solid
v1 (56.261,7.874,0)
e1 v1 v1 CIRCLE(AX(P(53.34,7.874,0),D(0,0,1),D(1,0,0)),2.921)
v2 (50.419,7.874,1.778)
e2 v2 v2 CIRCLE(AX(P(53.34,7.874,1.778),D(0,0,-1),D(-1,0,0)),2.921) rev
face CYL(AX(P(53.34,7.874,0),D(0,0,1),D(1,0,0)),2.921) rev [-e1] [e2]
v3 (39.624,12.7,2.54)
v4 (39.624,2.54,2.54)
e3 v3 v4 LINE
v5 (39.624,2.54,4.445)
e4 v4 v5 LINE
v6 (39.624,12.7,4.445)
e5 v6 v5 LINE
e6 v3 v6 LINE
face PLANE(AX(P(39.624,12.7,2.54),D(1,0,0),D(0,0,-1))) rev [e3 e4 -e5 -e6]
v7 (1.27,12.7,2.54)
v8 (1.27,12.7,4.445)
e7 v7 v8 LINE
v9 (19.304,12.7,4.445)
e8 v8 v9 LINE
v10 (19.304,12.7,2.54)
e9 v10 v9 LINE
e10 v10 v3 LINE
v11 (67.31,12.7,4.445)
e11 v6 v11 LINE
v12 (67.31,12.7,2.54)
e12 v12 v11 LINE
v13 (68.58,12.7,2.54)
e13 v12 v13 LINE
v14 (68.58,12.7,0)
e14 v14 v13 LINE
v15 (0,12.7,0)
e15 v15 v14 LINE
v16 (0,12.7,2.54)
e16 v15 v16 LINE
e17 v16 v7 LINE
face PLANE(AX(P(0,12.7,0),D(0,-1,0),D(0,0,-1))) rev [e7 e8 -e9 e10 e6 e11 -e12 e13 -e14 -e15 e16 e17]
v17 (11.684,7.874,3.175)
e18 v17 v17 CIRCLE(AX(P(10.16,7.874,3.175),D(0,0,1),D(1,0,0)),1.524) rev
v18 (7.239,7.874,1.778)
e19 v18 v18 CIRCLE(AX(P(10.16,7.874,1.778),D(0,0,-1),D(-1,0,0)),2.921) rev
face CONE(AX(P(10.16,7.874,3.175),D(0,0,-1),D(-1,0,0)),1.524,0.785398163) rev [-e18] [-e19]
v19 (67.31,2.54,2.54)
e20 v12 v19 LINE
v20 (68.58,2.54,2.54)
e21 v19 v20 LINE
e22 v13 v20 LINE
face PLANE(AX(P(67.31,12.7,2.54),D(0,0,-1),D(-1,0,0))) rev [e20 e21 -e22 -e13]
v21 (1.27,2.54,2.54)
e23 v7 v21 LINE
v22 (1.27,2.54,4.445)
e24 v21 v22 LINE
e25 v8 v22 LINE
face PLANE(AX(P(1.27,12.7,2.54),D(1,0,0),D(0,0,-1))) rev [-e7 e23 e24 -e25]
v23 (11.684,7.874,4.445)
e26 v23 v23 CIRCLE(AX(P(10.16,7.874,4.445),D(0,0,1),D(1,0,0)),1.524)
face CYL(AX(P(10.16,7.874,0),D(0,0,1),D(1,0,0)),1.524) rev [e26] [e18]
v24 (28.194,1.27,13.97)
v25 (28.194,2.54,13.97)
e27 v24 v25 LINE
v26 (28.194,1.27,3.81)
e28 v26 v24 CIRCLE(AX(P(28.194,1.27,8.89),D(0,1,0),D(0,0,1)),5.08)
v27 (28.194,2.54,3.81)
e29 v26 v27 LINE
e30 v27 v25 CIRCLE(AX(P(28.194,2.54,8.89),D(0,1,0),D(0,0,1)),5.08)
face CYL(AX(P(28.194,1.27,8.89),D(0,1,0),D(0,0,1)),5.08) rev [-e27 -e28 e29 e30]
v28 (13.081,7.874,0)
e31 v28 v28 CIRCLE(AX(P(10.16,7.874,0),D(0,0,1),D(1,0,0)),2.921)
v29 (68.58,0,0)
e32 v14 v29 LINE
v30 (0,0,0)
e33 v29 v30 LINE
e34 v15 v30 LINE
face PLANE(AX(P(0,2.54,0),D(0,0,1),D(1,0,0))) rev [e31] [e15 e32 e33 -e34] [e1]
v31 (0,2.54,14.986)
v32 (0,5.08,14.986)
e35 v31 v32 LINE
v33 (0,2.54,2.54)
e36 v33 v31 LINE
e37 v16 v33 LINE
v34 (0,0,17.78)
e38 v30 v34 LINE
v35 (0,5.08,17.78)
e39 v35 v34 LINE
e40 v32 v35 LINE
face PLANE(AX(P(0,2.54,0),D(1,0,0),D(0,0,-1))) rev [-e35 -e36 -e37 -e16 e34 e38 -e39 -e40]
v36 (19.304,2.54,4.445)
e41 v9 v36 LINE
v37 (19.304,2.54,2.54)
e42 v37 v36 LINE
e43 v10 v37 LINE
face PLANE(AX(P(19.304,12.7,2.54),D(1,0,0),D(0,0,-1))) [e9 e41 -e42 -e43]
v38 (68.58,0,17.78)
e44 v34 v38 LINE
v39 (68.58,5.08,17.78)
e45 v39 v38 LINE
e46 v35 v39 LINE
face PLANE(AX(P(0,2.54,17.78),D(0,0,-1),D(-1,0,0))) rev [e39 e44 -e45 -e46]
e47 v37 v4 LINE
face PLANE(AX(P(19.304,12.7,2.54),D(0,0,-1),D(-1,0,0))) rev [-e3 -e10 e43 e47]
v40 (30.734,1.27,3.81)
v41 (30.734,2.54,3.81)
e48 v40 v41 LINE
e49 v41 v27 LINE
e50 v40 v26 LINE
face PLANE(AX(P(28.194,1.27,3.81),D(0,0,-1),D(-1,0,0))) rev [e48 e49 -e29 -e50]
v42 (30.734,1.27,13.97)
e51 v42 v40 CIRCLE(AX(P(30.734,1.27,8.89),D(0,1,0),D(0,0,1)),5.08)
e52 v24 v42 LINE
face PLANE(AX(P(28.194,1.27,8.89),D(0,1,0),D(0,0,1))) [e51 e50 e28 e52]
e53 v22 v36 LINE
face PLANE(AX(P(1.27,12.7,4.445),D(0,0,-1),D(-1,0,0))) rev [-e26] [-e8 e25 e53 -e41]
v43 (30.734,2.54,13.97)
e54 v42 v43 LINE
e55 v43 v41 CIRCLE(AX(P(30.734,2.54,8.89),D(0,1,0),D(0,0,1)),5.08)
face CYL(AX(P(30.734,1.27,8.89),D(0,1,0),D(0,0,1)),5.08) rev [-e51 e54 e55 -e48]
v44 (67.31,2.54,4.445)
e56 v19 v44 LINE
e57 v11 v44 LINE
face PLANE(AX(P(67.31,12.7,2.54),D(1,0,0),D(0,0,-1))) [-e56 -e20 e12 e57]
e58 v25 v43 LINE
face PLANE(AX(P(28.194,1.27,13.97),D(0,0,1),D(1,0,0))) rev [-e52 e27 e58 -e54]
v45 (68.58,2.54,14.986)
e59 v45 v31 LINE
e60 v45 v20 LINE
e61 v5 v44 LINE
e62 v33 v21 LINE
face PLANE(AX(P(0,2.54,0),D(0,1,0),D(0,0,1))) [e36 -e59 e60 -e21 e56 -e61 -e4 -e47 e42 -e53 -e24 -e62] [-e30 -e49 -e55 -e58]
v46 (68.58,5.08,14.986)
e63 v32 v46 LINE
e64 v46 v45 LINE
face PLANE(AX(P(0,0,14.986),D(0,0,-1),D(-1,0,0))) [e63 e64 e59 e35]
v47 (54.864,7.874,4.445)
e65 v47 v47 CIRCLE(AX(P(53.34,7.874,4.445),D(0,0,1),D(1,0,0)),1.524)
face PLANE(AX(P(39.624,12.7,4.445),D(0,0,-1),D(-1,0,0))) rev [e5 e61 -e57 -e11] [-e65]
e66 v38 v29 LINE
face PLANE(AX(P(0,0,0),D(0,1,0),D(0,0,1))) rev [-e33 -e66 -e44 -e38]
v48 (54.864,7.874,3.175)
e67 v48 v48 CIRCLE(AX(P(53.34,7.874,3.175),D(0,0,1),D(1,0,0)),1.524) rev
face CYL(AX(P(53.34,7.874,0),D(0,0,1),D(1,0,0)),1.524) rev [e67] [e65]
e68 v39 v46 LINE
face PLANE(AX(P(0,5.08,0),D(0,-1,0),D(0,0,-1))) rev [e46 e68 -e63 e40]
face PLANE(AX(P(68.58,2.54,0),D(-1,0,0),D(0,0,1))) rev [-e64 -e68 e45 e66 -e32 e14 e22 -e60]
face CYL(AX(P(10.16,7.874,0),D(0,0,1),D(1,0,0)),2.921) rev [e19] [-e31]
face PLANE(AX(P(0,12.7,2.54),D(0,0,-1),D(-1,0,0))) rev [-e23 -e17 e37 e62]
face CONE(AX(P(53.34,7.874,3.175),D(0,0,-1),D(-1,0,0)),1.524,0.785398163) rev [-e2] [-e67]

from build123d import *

# Parameters (mm, degrees)
SKETCH2_W                           = 68.58
SKETCH2_H                           = 17.78
BOSS_EXTRUDE1_DEPTH                 = 2.54
SKETCH3_W                           = 68.58
SKETCH3_H                           = 2.54
BOSS_EXTRUDE2_DEPTH                 = 2.54
BOSS_EXTRUDE3_DEPTH                 = 10.16
SKETCH5_R                           = 1.524
CUT_EXTRUDE1_DEPTH                  = 72.009355898
CUT_EXTRUDE2_START                  = -3.81
SKETCH6_R                           = 2.921
CUT_EXTRUDE2_DEPTH                  = 68.199355898
CHAMFER1_SIZE                       = 2.54
CUT_EXTRUDE3_DEPTH                  = 1.27
SKETCH8_W                           = 68.58
SKETCH8_H                           = 2.54
EXTRA_WIDTH_FOR_MIRRORED_PART_DEPTH = 0.254


with BuildPart() as part:
    # Sketch2 → Boss-Extrude1 (new body)
    with BuildSketch(Plane(origin=(0, 0, 0), x_dir=(1, 0, 0), z_dir=(0, 1, 0))):
        with Locations((34.29, -8.89)):
            Rectangle(SKETCH2_W, SKETCH2_H)
    extrude(amount=BOSS_EXTRUDE1_DEPTH)

    # Sketch3 → Boss-Extrude2 (add)
    with BuildSketch(Plane(origin=(0, 2.54, 0), x_dir=(1, 0, 0), z_dir=(0, 1, 0))):
        with Locations((34.29, -16.51)):
            Rectangle(SKETCH3_W, SKETCH3_H)
    extrude(amount=BOSS_EXTRUDE2_DEPTH)

    # Sketch4 → Boss-Extrude3 (add)
    with BuildSketch(Plane(origin=(0, 2.54, 0), x_dir=(1, 0, 0), z_dir=(0, 1, 0))):
        Polygon((0, 0), (68.58, 0), (68.58, -2.54), (67.31, -2.54), (67.31, -4.445), (39.624, -4.445), (39.624, -2.54), (19.304, -2.54), (19.304, -4.445), (1.27, -4.445), (1.27, -2.54), (0, -2.54), align=None)
    extrude(amount=BOSS_EXTRUDE3_DEPTH)

    # Sketch5 → Cut-Extrude1 (cut, through all)
    with BuildSketch(Plane.XY.offset(4.445)):
        with Locations((10.16, 7.874)):
            Circle(SKETCH5_R)
        with Locations((53.34, 7.874)):
            Circle(SKETCH5_R)
    extrude(amount=-CUT_EXTRUDE1_DEPTH, mode=Mode.SUBTRACT)

    # Sketch6 → Cut-Extrude2 (cut, through all)
    with BuildSketch(Plane.XY.offset(4.445).offset(CUT_EXTRUDE2_START)):
        with Locations((10.16, 7.874)):
            Circle(SKETCH6_R)
        with Locations((53.34, 7.874)):
            Circle(SKETCH6_R)
    extrude(amount=-CUT_EXTRUDE2_DEPTH, mode=Mode.SUBTRACT)

    # Chamfer1
    # the kernel refuses this chamfer: 2.54 mm, written as the material it takes off along each edge
    with BuildSketch(Plane(origin=(53.34, 7.874, 0.635), x_dir=(1, 0, 0), z_dir=(0, -1, 0))) as chamfer1_piece_1_section:
        Polygon((1.524 + CHAMFER1_SIZE, 0), (1.524, CHAMFER1_SIZE), (1.524, 0), align=None)
    chamfer1_piece_1 = revolve(axis=Axis((53.34, 7.874, 0.635), (0, 0, 1)), mode=Mode.PRIVATE)
    chamfer1_piece_1 = chamfer1_piece_1 & Plane(origin=(53.34, 7.874, 2.488878995), x_dir=(1, 0, 0), z_dir=(0, 0, 1)) * Cylinder(2.921, 17, mode=Mode.PRIVATE)
    add(chamfer1_piece_1, mode=Mode.SUBTRACT)
    with BuildSketch(Plane(origin=(10.16, 7.874, 0.635), x_dir=(1, 0, 0), z_dir=(0, -1, 0))) as chamfer1_piece_2_section:
        Polygon((1.524 + CHAMFER1_SIZE, 0), (1.524, CHAMFER1_SIZE), (1.524, 0), align=None)
    chamfer1_piece_2 = revolve(axis=Axis((10.16, 7.874, 0.635), (0, 0, 1)), mode=Mode.PRIVATE)
    chamfer1_piece_2 = chamfer1_piece_2 & Plane(origin=(10.16, 7.874, 2.488878995), x_dir=(1, 0, 0), z_dir=(0, 0, 1)) * Cylinder(2.921, 17, mode=Mode.PRIVATE)
    add(chamfer1_piece_2, mode=Mode.SUBTRACT)

    # Sketch7 → Cut-Extrude3 (cut)
    with BuildSketch(Plane(origin=(0, 2.54, 0), x_dir=(1, 0, 0), z_dir=(0, 1, 0))):
        with BuildLine():
            Line((28.194, -3.81), (30.734, -3.81))
            ThreePointArc((30.734, -3.81), (35.814, -8.89), (30.734, -13.97))
            Line((30.734, -13.97), (28.194, -13.97))
            ThreePointArc((28.194, -13.97), (23.114, -8.89), (28.194, -3.81))
        make_face()
    extrude(amount=-CUT_EXTRUDE3_DEPTH, mode=Mode.SUBTRACT)

    # Sketch8 → Extra_width_for_mirrored_part (add)
    with BuildSketch(Plane(origin=(0, 0, 15.24), x_dir=(-1, 0, 0), z_dir=(0, 0, -1))):
        with Locations((-34.29, 3.81)):
            Rectangle(SKETCH8_W, SKETCH8_H)
    extrude(amount=EXTRA_WIDTH_FOR_MIRRORED_PART_DEPTH)


solid = part.part
